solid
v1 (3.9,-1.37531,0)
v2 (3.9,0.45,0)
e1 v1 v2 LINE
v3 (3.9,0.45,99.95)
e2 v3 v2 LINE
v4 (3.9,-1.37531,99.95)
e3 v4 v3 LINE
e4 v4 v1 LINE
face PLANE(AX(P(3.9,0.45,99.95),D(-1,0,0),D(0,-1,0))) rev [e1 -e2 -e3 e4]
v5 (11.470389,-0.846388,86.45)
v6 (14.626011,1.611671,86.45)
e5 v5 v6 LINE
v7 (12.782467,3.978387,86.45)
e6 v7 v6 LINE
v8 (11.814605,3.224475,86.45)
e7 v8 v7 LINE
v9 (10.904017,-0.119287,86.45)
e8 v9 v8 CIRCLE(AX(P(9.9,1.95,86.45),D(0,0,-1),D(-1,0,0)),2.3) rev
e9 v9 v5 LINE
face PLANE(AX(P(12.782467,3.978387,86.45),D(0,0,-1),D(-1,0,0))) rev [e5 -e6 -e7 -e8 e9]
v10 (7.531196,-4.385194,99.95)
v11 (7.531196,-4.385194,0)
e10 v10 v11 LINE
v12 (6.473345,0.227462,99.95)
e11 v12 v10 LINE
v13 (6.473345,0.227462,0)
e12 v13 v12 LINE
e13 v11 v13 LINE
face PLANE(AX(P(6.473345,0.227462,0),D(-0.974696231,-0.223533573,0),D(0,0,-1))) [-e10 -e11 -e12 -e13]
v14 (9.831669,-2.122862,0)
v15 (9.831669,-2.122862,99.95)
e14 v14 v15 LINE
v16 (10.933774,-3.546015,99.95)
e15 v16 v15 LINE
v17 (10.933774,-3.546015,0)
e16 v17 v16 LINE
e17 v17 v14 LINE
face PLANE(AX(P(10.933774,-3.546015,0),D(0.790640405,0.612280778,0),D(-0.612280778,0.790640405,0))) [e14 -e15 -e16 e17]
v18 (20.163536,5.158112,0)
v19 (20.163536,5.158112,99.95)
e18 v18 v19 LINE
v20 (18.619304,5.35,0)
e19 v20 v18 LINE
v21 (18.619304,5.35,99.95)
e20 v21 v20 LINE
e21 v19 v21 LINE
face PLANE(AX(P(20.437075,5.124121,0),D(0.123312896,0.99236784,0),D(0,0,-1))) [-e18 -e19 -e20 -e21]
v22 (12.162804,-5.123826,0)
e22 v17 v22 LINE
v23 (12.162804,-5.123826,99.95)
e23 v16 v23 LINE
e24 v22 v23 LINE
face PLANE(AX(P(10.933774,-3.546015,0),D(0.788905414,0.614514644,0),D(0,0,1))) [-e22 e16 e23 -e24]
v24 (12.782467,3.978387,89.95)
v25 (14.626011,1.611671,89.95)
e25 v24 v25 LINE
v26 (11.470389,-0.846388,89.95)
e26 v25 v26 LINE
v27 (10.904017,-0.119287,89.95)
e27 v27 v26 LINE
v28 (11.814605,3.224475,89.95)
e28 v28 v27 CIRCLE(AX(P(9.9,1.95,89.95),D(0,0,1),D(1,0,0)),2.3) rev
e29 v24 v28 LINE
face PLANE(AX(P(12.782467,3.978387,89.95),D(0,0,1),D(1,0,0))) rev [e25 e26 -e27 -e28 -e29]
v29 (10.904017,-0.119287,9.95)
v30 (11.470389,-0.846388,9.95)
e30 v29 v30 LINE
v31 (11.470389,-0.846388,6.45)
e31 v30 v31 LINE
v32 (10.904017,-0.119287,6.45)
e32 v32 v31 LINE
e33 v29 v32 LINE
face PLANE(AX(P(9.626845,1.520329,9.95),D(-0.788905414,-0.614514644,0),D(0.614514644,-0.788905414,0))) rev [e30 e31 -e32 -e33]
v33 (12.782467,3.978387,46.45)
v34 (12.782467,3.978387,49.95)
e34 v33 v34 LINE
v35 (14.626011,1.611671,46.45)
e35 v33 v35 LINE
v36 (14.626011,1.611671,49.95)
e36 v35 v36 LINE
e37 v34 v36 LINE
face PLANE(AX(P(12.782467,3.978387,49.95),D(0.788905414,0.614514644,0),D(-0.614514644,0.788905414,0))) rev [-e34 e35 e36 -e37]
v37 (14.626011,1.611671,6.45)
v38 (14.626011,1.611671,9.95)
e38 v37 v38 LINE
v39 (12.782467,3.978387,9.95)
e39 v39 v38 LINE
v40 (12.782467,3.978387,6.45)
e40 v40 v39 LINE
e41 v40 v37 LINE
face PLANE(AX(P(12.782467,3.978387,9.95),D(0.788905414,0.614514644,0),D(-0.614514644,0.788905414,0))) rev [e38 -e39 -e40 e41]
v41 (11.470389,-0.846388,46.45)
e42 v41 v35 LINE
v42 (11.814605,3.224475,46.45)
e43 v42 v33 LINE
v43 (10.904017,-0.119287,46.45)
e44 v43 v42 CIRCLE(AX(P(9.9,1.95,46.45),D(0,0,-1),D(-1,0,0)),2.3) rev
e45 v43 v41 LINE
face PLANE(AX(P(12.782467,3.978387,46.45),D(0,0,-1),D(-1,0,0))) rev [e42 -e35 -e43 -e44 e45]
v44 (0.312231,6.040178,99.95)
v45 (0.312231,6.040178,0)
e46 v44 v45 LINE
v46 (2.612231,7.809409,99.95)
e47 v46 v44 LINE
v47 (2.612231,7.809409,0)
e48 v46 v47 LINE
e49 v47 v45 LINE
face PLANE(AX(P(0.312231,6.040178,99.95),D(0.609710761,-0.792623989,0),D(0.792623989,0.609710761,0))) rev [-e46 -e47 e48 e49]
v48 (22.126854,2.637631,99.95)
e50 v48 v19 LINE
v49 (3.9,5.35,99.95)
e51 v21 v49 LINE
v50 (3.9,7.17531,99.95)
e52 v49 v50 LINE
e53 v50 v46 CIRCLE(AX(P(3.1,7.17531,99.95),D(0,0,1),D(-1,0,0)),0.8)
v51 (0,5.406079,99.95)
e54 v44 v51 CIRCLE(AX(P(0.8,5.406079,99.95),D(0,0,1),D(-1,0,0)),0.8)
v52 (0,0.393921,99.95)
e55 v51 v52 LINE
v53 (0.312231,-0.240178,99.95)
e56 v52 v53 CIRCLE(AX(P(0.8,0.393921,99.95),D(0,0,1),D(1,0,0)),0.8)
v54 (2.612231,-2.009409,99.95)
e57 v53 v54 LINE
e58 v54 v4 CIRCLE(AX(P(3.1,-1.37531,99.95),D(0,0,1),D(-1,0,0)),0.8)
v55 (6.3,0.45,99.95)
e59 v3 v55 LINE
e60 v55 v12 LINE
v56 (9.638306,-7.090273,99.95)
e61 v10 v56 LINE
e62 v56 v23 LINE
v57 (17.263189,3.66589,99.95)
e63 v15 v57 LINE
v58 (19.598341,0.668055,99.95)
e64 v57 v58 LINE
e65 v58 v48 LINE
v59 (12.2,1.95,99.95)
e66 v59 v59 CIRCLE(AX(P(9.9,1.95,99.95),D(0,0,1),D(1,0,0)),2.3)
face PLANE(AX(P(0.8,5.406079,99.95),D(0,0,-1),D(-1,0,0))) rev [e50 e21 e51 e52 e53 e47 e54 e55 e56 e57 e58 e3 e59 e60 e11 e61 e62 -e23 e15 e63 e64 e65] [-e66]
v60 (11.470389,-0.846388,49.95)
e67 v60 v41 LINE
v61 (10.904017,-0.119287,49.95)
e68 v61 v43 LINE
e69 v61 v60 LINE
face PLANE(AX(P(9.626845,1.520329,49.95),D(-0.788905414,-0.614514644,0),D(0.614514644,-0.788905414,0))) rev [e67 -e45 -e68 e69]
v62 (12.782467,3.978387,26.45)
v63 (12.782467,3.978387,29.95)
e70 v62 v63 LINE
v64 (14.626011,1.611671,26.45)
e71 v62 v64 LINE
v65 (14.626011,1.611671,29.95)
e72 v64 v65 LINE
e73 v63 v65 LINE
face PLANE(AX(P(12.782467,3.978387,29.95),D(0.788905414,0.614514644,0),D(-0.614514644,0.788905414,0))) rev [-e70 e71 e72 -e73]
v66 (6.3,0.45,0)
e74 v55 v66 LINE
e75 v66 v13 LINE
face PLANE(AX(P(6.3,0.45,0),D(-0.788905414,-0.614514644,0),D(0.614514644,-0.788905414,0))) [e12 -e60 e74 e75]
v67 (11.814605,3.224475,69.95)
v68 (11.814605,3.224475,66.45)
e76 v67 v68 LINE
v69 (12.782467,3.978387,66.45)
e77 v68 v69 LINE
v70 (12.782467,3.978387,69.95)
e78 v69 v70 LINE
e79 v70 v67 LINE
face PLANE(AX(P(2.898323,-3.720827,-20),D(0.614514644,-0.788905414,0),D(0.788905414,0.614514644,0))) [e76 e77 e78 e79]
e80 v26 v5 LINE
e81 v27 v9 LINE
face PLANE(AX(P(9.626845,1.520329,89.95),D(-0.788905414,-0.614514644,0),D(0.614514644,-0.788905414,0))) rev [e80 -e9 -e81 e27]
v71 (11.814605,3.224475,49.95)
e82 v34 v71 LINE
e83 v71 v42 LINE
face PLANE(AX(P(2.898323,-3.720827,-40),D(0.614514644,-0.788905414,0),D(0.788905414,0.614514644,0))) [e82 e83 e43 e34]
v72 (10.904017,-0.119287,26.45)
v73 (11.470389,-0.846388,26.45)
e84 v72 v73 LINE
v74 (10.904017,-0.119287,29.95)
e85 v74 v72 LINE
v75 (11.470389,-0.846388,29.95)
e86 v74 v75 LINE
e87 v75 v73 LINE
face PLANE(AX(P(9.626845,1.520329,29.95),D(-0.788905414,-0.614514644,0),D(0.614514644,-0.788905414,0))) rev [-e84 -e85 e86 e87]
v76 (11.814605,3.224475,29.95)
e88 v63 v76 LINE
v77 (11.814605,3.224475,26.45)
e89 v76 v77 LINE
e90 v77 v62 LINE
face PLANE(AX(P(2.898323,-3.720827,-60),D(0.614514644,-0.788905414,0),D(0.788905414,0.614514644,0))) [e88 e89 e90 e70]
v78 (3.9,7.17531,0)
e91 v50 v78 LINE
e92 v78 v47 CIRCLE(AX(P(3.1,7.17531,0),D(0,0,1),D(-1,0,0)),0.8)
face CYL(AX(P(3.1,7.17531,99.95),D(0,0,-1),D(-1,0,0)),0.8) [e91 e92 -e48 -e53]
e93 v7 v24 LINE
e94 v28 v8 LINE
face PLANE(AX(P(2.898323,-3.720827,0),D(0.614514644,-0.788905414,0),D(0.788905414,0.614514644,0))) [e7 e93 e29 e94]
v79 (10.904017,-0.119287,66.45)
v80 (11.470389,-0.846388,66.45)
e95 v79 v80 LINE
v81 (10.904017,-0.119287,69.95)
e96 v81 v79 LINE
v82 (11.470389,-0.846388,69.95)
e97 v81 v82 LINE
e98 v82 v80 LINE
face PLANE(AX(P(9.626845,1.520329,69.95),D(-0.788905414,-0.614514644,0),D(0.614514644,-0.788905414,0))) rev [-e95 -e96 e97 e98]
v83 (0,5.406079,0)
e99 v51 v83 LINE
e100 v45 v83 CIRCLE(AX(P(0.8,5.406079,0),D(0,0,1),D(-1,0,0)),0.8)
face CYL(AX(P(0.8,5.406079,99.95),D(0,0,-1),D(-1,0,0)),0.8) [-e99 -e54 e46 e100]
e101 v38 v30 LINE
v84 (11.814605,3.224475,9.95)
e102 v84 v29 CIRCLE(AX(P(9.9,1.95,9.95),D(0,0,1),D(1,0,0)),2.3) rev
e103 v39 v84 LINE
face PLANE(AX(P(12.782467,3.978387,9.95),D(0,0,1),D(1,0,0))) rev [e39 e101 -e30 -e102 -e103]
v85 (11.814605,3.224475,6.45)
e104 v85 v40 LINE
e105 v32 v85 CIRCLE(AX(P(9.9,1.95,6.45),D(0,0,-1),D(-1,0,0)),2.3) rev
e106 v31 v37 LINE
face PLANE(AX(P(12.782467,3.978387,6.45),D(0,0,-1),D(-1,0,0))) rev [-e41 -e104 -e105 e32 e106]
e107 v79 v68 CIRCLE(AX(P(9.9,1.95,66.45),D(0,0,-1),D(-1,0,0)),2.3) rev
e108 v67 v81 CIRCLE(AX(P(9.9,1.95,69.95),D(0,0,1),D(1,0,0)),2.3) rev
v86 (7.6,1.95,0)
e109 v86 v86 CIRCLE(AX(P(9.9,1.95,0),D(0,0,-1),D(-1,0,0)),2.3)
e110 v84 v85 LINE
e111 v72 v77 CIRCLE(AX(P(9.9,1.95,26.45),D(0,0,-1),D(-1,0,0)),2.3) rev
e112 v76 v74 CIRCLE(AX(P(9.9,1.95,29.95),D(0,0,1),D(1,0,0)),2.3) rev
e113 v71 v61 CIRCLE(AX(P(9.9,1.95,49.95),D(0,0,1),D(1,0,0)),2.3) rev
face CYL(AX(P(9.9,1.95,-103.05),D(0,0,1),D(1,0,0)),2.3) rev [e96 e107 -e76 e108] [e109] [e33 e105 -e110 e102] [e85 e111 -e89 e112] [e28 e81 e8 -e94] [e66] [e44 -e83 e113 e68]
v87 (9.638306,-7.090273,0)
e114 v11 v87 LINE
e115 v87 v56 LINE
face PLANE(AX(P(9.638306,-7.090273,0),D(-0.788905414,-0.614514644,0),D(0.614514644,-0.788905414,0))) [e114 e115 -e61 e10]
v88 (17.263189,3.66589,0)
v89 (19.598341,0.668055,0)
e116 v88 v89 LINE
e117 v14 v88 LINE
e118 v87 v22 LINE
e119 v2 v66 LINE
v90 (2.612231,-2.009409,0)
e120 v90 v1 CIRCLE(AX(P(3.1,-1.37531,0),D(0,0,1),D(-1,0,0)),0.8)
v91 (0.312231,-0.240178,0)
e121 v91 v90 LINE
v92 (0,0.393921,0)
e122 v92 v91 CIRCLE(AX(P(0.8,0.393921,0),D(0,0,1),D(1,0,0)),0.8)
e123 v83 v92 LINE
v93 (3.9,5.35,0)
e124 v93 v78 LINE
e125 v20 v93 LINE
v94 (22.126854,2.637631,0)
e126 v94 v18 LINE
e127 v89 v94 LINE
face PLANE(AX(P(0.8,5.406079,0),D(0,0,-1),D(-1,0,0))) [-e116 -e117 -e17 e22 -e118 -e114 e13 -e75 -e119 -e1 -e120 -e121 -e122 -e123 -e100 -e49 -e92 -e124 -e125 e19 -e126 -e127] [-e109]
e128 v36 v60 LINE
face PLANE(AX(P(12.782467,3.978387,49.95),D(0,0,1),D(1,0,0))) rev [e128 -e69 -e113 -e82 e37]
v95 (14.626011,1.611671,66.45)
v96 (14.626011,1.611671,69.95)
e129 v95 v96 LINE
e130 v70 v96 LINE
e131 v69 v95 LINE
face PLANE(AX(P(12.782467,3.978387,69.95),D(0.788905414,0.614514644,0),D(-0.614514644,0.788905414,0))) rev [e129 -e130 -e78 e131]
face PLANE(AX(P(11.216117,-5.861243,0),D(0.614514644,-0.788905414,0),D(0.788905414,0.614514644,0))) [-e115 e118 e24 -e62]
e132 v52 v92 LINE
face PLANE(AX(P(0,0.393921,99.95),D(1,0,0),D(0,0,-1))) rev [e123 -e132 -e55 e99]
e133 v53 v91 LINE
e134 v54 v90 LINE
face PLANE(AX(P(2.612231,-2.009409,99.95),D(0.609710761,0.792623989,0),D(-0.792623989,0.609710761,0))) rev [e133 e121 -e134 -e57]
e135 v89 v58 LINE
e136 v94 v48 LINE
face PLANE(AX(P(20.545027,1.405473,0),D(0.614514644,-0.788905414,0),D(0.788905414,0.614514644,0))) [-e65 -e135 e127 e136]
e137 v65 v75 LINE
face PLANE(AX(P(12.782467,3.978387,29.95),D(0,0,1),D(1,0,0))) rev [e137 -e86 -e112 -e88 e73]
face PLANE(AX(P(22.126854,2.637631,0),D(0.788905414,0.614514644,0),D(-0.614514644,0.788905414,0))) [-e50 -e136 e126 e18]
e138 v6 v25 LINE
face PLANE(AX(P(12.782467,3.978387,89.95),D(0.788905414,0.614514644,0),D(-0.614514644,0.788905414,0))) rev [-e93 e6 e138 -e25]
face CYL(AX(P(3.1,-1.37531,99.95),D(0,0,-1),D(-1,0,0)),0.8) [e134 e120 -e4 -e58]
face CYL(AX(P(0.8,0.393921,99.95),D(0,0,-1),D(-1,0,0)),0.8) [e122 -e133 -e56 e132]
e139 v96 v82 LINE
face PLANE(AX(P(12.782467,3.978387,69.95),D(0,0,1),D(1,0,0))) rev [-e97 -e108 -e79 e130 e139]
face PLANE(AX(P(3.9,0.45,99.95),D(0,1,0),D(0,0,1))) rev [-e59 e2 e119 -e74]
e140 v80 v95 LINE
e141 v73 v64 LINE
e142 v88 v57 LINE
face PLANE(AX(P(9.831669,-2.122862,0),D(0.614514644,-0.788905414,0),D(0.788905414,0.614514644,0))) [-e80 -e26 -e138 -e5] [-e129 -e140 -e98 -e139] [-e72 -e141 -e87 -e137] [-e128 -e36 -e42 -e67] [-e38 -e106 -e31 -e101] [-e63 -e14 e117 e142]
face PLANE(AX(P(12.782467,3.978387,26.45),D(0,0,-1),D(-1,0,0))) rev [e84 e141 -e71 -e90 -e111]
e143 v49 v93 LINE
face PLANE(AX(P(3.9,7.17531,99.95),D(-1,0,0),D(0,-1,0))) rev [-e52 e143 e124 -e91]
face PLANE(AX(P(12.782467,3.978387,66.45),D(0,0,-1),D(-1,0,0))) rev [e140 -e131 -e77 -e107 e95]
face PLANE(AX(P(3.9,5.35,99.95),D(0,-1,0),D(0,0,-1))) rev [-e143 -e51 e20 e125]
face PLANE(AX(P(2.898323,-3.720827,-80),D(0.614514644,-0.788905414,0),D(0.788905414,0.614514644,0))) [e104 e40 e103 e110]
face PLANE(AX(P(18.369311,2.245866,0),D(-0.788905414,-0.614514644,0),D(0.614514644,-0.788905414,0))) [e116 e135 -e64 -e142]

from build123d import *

# Parameters (mm, degrees)
BOSS_EXTRUDE1_DEPTH = 99.95
BOSS_EXTRUDE2_DEPTH = 99.95
SKETCH3_R           = 2.3
CUT_EXTRUDE1_DEPTH  = 203
SKETCH4_W           = 3.5
SKETCH4_H           = 4
CUT_EXTRUDE2_DEPTH  = 3
LPATTERN1_COUNT     = 10
LPATTERN1_PITCH     = 20
THICKEN1_T1         = 2
THICKEN2_T1         = 2
BOSS_EXTRUDE3_DEPTH = 99.95
CHAMFER1_SIZE       = 4.717915225
CHAMFER1_SIZE_2     = 2.2
CHAMFER2_SIZE       = 2.2


with BuildPart() as part:
    # Sketch1 → Boss-Extrude1 (new body)
    with BuildSketch(Plane.XY):
        with BuildLine():
            Line((0, 0.393921198), (0, 5.406078802))
            ThreePointArc((0, 5.406078802), (0.08229014, 5.759480212), (0.312231391, 6.040177993))
            Line((0.312231391, 6.040177993), (2.612231391, 7.809408763))
            ThreePointArc((2.612231391, 7.809408763), (3.45340141, 7.893019432), (3.9, 7.175309571))
            Line((3.9, 7.175309571), (3.9, 5.35))
            Line((3.9, 5.35), (6.3, 5.35))
            Line((6.3, 5.35), (6.3, 0.45))
            Line((6.3, 0.45), (3.9, 0.45))
            Line((3.9, 0.45), (3.9, -1.375309571))
            ThreePointArc((3.9, -1.375309571), (3.45340141, -2.093019432), (2.612231391, -2.009408763))
            Line((2.612231391, -2.009408763), (0.312231391, -0.240177993))
            ThreePointArc((0.312231391, -0.240177993), (0.08229014, 0.040519788), (0, 0.393921198))
        make_face()
    extrude(amount=BOSS_EXTRUDE1_DEPTH)

    # Sketch2 → Boss-Extrude2 (add)
    with BuildSketch(Plane.XY.offset(99.95)):
        Polygon((17.472453889, 5.35), (6.3, 5.35), (6.3, 0.45), (9.987087866, -4.283432483), (10.933774362, -3.54601491), (9.831668963, -2.122862181), (17.26318939, 3.66589025), (18.369311325, 2.245866185), (19.315997822, 2.983283759), align=None)
    extrude(amount=-BOSS_EXTRUDE2_DEPTH)

    # Sketch3 → Cut-Extrude1 (cut)
    with BuildSketch(Plane.XY.offset(99.95)):
        with Locations((9.9, 1.95)):
            Circle(SKETCH3_R)
    extrude(amount=-CUT_EXTRUDE1_DEPTH, mode=Mode.SUBTRACT)

    # Sketch4 → Cut-Extrude2 (cut)
    with BuildSketch(Plane(origin=(6.0943119, -5.034061174, 0), x_dir=(0, 0, -1), z_dir=(0.6145146443247225, -0.7889054137920846, 0))):
        with Locations((-88.2, 8.814603366)):
            Rectangle(SKETCH4_W, SKETCH4_H)
    cut_extrude2 = extrude(amount=-CUT_EXTRUDE2_DEPTH, mode=Mode.SUBTRACT)

    # LPattern1: Cut-Extrude2 ×10
    with Locations(*[(0, 0, -i * LPATTERN1_PITCH) for i in range(1, LPATTERN1_COUNT)]):
        add(cut_extrude2, mode=Mode.SUBTRACT)

    # Surface-Offset1: a surface, a copy of 1 face of the part
    surface_offset1_1 = part.part.faces().sort_by_distance((10.460431114, -3.914723696, 49.975))[0]
    add(Solid.thicken(surface_offset1_1, THICKEN1_T1))

    # Surface-Offset2: a surface, a copy of 1 face of the part
    surface_offset2_2 = part.part.faces().sort_by_distance((18.842654573, 2.614574972, 49.975))[0]
    add(Solid.thicken(surface_offset2_2, THICKEN2_T1))

    # Sketch5 → Boss-Extrude3 (add)
    with BuildSketch(Plane.XY.offset(99.95)):
        Polygon((11.216117155, -5.86124331), (9.638306327, -7.090272599), (7.794762394, -4.723556358), (9.372573222, -3.494527069), align=None)
        Polygon((22.126854473, 2.637630884), (20.28331054, 5.004347125), (17.754796681, 3.034771599), (19.598340614, 0.668055358), align=None)
    extrude(amount=-BOSS_EXTRUDE3_DEPTH)

    # Chamfer1
    # the kernel refuses this chamfer: 4.717915225, 2.2 mm, written as the material it adds along each edge
    with BuildSketch(Plane(origin=(9.372573222, -3.494527069, 99.95), x_dir=(-0.6015649261356993, 0.7988239102852083, 0), z_dir=(0, 0, -1))) as chamfer1_piece_1_section:
        Polygon((CHAMFER1_SIZE * 0.999866964139, -CHAMFER1_SIZE * 0.0163111641315), (-CHAMFER1_SIZE_2 * 0.0163111641311, -CHAMFER1_SIZE_2 * 0.999866964113), (0, 0), align=None)
    chamfer1_piece_1 = extrude(amount=99.95, mode=Mode.PRIVATE)
    chamfer1_piece_1 = split(chamfer1_piece_1, bisect_by=Plane(origin=(6.797025318, -3.442675278, 49.975), z_dir=(0.7889054137920843, 0.6145146443247225, 0)), keep=Keep.TOP, mode=Mode.PRIVATE)
    add(chamfer1_piece_1)

    # Chamfer2
    # the kernel refuses this chamfer: 2.2 mm, written as the material it adds along each edge
    with BuildSketch(Plane(origin=(18.701483177, 3.772189172, 0), x_dir=(-0.6359739526449933, 0.7717105231607922, 0), z_dir=(0, 0, 1))) as chamfer2_piece_1_section:
        Polygon((CHAMFER2_SIZE * 0.999621916911, -CHAMFER2_SIZE * 0.0274958766106), (-CHAMFER2_SIZE * 0.0274958766106, -CHAMFER2_SIZE * 0.999621916911), (0, 0), align=None)
    chamfer2_piece_1 = extrude(amount=99.95, mode=Mode.PRIVATE)
    chamfer2_piece_1 = split(chamfer2_piece_1, bisect_by=Plane(origin=(18.850985857, 5.35, 49.975), z_dir=(0, -1, 0)), keep=Keep.TOP, mode=Mode.PRIVATE)
    chamfer2_piece_1 = split(chamfer2_piece_1, bisect_by=Plane(origin=(19.861540809, 5.545809281, 49.975), z_dir=(-0.7889054137920902, -0.614514644324715, 0)), keep=Keep.TOP, mode=Mode.PRIVATE)
    add(chamfer2_piece_1)


solid = part.part
